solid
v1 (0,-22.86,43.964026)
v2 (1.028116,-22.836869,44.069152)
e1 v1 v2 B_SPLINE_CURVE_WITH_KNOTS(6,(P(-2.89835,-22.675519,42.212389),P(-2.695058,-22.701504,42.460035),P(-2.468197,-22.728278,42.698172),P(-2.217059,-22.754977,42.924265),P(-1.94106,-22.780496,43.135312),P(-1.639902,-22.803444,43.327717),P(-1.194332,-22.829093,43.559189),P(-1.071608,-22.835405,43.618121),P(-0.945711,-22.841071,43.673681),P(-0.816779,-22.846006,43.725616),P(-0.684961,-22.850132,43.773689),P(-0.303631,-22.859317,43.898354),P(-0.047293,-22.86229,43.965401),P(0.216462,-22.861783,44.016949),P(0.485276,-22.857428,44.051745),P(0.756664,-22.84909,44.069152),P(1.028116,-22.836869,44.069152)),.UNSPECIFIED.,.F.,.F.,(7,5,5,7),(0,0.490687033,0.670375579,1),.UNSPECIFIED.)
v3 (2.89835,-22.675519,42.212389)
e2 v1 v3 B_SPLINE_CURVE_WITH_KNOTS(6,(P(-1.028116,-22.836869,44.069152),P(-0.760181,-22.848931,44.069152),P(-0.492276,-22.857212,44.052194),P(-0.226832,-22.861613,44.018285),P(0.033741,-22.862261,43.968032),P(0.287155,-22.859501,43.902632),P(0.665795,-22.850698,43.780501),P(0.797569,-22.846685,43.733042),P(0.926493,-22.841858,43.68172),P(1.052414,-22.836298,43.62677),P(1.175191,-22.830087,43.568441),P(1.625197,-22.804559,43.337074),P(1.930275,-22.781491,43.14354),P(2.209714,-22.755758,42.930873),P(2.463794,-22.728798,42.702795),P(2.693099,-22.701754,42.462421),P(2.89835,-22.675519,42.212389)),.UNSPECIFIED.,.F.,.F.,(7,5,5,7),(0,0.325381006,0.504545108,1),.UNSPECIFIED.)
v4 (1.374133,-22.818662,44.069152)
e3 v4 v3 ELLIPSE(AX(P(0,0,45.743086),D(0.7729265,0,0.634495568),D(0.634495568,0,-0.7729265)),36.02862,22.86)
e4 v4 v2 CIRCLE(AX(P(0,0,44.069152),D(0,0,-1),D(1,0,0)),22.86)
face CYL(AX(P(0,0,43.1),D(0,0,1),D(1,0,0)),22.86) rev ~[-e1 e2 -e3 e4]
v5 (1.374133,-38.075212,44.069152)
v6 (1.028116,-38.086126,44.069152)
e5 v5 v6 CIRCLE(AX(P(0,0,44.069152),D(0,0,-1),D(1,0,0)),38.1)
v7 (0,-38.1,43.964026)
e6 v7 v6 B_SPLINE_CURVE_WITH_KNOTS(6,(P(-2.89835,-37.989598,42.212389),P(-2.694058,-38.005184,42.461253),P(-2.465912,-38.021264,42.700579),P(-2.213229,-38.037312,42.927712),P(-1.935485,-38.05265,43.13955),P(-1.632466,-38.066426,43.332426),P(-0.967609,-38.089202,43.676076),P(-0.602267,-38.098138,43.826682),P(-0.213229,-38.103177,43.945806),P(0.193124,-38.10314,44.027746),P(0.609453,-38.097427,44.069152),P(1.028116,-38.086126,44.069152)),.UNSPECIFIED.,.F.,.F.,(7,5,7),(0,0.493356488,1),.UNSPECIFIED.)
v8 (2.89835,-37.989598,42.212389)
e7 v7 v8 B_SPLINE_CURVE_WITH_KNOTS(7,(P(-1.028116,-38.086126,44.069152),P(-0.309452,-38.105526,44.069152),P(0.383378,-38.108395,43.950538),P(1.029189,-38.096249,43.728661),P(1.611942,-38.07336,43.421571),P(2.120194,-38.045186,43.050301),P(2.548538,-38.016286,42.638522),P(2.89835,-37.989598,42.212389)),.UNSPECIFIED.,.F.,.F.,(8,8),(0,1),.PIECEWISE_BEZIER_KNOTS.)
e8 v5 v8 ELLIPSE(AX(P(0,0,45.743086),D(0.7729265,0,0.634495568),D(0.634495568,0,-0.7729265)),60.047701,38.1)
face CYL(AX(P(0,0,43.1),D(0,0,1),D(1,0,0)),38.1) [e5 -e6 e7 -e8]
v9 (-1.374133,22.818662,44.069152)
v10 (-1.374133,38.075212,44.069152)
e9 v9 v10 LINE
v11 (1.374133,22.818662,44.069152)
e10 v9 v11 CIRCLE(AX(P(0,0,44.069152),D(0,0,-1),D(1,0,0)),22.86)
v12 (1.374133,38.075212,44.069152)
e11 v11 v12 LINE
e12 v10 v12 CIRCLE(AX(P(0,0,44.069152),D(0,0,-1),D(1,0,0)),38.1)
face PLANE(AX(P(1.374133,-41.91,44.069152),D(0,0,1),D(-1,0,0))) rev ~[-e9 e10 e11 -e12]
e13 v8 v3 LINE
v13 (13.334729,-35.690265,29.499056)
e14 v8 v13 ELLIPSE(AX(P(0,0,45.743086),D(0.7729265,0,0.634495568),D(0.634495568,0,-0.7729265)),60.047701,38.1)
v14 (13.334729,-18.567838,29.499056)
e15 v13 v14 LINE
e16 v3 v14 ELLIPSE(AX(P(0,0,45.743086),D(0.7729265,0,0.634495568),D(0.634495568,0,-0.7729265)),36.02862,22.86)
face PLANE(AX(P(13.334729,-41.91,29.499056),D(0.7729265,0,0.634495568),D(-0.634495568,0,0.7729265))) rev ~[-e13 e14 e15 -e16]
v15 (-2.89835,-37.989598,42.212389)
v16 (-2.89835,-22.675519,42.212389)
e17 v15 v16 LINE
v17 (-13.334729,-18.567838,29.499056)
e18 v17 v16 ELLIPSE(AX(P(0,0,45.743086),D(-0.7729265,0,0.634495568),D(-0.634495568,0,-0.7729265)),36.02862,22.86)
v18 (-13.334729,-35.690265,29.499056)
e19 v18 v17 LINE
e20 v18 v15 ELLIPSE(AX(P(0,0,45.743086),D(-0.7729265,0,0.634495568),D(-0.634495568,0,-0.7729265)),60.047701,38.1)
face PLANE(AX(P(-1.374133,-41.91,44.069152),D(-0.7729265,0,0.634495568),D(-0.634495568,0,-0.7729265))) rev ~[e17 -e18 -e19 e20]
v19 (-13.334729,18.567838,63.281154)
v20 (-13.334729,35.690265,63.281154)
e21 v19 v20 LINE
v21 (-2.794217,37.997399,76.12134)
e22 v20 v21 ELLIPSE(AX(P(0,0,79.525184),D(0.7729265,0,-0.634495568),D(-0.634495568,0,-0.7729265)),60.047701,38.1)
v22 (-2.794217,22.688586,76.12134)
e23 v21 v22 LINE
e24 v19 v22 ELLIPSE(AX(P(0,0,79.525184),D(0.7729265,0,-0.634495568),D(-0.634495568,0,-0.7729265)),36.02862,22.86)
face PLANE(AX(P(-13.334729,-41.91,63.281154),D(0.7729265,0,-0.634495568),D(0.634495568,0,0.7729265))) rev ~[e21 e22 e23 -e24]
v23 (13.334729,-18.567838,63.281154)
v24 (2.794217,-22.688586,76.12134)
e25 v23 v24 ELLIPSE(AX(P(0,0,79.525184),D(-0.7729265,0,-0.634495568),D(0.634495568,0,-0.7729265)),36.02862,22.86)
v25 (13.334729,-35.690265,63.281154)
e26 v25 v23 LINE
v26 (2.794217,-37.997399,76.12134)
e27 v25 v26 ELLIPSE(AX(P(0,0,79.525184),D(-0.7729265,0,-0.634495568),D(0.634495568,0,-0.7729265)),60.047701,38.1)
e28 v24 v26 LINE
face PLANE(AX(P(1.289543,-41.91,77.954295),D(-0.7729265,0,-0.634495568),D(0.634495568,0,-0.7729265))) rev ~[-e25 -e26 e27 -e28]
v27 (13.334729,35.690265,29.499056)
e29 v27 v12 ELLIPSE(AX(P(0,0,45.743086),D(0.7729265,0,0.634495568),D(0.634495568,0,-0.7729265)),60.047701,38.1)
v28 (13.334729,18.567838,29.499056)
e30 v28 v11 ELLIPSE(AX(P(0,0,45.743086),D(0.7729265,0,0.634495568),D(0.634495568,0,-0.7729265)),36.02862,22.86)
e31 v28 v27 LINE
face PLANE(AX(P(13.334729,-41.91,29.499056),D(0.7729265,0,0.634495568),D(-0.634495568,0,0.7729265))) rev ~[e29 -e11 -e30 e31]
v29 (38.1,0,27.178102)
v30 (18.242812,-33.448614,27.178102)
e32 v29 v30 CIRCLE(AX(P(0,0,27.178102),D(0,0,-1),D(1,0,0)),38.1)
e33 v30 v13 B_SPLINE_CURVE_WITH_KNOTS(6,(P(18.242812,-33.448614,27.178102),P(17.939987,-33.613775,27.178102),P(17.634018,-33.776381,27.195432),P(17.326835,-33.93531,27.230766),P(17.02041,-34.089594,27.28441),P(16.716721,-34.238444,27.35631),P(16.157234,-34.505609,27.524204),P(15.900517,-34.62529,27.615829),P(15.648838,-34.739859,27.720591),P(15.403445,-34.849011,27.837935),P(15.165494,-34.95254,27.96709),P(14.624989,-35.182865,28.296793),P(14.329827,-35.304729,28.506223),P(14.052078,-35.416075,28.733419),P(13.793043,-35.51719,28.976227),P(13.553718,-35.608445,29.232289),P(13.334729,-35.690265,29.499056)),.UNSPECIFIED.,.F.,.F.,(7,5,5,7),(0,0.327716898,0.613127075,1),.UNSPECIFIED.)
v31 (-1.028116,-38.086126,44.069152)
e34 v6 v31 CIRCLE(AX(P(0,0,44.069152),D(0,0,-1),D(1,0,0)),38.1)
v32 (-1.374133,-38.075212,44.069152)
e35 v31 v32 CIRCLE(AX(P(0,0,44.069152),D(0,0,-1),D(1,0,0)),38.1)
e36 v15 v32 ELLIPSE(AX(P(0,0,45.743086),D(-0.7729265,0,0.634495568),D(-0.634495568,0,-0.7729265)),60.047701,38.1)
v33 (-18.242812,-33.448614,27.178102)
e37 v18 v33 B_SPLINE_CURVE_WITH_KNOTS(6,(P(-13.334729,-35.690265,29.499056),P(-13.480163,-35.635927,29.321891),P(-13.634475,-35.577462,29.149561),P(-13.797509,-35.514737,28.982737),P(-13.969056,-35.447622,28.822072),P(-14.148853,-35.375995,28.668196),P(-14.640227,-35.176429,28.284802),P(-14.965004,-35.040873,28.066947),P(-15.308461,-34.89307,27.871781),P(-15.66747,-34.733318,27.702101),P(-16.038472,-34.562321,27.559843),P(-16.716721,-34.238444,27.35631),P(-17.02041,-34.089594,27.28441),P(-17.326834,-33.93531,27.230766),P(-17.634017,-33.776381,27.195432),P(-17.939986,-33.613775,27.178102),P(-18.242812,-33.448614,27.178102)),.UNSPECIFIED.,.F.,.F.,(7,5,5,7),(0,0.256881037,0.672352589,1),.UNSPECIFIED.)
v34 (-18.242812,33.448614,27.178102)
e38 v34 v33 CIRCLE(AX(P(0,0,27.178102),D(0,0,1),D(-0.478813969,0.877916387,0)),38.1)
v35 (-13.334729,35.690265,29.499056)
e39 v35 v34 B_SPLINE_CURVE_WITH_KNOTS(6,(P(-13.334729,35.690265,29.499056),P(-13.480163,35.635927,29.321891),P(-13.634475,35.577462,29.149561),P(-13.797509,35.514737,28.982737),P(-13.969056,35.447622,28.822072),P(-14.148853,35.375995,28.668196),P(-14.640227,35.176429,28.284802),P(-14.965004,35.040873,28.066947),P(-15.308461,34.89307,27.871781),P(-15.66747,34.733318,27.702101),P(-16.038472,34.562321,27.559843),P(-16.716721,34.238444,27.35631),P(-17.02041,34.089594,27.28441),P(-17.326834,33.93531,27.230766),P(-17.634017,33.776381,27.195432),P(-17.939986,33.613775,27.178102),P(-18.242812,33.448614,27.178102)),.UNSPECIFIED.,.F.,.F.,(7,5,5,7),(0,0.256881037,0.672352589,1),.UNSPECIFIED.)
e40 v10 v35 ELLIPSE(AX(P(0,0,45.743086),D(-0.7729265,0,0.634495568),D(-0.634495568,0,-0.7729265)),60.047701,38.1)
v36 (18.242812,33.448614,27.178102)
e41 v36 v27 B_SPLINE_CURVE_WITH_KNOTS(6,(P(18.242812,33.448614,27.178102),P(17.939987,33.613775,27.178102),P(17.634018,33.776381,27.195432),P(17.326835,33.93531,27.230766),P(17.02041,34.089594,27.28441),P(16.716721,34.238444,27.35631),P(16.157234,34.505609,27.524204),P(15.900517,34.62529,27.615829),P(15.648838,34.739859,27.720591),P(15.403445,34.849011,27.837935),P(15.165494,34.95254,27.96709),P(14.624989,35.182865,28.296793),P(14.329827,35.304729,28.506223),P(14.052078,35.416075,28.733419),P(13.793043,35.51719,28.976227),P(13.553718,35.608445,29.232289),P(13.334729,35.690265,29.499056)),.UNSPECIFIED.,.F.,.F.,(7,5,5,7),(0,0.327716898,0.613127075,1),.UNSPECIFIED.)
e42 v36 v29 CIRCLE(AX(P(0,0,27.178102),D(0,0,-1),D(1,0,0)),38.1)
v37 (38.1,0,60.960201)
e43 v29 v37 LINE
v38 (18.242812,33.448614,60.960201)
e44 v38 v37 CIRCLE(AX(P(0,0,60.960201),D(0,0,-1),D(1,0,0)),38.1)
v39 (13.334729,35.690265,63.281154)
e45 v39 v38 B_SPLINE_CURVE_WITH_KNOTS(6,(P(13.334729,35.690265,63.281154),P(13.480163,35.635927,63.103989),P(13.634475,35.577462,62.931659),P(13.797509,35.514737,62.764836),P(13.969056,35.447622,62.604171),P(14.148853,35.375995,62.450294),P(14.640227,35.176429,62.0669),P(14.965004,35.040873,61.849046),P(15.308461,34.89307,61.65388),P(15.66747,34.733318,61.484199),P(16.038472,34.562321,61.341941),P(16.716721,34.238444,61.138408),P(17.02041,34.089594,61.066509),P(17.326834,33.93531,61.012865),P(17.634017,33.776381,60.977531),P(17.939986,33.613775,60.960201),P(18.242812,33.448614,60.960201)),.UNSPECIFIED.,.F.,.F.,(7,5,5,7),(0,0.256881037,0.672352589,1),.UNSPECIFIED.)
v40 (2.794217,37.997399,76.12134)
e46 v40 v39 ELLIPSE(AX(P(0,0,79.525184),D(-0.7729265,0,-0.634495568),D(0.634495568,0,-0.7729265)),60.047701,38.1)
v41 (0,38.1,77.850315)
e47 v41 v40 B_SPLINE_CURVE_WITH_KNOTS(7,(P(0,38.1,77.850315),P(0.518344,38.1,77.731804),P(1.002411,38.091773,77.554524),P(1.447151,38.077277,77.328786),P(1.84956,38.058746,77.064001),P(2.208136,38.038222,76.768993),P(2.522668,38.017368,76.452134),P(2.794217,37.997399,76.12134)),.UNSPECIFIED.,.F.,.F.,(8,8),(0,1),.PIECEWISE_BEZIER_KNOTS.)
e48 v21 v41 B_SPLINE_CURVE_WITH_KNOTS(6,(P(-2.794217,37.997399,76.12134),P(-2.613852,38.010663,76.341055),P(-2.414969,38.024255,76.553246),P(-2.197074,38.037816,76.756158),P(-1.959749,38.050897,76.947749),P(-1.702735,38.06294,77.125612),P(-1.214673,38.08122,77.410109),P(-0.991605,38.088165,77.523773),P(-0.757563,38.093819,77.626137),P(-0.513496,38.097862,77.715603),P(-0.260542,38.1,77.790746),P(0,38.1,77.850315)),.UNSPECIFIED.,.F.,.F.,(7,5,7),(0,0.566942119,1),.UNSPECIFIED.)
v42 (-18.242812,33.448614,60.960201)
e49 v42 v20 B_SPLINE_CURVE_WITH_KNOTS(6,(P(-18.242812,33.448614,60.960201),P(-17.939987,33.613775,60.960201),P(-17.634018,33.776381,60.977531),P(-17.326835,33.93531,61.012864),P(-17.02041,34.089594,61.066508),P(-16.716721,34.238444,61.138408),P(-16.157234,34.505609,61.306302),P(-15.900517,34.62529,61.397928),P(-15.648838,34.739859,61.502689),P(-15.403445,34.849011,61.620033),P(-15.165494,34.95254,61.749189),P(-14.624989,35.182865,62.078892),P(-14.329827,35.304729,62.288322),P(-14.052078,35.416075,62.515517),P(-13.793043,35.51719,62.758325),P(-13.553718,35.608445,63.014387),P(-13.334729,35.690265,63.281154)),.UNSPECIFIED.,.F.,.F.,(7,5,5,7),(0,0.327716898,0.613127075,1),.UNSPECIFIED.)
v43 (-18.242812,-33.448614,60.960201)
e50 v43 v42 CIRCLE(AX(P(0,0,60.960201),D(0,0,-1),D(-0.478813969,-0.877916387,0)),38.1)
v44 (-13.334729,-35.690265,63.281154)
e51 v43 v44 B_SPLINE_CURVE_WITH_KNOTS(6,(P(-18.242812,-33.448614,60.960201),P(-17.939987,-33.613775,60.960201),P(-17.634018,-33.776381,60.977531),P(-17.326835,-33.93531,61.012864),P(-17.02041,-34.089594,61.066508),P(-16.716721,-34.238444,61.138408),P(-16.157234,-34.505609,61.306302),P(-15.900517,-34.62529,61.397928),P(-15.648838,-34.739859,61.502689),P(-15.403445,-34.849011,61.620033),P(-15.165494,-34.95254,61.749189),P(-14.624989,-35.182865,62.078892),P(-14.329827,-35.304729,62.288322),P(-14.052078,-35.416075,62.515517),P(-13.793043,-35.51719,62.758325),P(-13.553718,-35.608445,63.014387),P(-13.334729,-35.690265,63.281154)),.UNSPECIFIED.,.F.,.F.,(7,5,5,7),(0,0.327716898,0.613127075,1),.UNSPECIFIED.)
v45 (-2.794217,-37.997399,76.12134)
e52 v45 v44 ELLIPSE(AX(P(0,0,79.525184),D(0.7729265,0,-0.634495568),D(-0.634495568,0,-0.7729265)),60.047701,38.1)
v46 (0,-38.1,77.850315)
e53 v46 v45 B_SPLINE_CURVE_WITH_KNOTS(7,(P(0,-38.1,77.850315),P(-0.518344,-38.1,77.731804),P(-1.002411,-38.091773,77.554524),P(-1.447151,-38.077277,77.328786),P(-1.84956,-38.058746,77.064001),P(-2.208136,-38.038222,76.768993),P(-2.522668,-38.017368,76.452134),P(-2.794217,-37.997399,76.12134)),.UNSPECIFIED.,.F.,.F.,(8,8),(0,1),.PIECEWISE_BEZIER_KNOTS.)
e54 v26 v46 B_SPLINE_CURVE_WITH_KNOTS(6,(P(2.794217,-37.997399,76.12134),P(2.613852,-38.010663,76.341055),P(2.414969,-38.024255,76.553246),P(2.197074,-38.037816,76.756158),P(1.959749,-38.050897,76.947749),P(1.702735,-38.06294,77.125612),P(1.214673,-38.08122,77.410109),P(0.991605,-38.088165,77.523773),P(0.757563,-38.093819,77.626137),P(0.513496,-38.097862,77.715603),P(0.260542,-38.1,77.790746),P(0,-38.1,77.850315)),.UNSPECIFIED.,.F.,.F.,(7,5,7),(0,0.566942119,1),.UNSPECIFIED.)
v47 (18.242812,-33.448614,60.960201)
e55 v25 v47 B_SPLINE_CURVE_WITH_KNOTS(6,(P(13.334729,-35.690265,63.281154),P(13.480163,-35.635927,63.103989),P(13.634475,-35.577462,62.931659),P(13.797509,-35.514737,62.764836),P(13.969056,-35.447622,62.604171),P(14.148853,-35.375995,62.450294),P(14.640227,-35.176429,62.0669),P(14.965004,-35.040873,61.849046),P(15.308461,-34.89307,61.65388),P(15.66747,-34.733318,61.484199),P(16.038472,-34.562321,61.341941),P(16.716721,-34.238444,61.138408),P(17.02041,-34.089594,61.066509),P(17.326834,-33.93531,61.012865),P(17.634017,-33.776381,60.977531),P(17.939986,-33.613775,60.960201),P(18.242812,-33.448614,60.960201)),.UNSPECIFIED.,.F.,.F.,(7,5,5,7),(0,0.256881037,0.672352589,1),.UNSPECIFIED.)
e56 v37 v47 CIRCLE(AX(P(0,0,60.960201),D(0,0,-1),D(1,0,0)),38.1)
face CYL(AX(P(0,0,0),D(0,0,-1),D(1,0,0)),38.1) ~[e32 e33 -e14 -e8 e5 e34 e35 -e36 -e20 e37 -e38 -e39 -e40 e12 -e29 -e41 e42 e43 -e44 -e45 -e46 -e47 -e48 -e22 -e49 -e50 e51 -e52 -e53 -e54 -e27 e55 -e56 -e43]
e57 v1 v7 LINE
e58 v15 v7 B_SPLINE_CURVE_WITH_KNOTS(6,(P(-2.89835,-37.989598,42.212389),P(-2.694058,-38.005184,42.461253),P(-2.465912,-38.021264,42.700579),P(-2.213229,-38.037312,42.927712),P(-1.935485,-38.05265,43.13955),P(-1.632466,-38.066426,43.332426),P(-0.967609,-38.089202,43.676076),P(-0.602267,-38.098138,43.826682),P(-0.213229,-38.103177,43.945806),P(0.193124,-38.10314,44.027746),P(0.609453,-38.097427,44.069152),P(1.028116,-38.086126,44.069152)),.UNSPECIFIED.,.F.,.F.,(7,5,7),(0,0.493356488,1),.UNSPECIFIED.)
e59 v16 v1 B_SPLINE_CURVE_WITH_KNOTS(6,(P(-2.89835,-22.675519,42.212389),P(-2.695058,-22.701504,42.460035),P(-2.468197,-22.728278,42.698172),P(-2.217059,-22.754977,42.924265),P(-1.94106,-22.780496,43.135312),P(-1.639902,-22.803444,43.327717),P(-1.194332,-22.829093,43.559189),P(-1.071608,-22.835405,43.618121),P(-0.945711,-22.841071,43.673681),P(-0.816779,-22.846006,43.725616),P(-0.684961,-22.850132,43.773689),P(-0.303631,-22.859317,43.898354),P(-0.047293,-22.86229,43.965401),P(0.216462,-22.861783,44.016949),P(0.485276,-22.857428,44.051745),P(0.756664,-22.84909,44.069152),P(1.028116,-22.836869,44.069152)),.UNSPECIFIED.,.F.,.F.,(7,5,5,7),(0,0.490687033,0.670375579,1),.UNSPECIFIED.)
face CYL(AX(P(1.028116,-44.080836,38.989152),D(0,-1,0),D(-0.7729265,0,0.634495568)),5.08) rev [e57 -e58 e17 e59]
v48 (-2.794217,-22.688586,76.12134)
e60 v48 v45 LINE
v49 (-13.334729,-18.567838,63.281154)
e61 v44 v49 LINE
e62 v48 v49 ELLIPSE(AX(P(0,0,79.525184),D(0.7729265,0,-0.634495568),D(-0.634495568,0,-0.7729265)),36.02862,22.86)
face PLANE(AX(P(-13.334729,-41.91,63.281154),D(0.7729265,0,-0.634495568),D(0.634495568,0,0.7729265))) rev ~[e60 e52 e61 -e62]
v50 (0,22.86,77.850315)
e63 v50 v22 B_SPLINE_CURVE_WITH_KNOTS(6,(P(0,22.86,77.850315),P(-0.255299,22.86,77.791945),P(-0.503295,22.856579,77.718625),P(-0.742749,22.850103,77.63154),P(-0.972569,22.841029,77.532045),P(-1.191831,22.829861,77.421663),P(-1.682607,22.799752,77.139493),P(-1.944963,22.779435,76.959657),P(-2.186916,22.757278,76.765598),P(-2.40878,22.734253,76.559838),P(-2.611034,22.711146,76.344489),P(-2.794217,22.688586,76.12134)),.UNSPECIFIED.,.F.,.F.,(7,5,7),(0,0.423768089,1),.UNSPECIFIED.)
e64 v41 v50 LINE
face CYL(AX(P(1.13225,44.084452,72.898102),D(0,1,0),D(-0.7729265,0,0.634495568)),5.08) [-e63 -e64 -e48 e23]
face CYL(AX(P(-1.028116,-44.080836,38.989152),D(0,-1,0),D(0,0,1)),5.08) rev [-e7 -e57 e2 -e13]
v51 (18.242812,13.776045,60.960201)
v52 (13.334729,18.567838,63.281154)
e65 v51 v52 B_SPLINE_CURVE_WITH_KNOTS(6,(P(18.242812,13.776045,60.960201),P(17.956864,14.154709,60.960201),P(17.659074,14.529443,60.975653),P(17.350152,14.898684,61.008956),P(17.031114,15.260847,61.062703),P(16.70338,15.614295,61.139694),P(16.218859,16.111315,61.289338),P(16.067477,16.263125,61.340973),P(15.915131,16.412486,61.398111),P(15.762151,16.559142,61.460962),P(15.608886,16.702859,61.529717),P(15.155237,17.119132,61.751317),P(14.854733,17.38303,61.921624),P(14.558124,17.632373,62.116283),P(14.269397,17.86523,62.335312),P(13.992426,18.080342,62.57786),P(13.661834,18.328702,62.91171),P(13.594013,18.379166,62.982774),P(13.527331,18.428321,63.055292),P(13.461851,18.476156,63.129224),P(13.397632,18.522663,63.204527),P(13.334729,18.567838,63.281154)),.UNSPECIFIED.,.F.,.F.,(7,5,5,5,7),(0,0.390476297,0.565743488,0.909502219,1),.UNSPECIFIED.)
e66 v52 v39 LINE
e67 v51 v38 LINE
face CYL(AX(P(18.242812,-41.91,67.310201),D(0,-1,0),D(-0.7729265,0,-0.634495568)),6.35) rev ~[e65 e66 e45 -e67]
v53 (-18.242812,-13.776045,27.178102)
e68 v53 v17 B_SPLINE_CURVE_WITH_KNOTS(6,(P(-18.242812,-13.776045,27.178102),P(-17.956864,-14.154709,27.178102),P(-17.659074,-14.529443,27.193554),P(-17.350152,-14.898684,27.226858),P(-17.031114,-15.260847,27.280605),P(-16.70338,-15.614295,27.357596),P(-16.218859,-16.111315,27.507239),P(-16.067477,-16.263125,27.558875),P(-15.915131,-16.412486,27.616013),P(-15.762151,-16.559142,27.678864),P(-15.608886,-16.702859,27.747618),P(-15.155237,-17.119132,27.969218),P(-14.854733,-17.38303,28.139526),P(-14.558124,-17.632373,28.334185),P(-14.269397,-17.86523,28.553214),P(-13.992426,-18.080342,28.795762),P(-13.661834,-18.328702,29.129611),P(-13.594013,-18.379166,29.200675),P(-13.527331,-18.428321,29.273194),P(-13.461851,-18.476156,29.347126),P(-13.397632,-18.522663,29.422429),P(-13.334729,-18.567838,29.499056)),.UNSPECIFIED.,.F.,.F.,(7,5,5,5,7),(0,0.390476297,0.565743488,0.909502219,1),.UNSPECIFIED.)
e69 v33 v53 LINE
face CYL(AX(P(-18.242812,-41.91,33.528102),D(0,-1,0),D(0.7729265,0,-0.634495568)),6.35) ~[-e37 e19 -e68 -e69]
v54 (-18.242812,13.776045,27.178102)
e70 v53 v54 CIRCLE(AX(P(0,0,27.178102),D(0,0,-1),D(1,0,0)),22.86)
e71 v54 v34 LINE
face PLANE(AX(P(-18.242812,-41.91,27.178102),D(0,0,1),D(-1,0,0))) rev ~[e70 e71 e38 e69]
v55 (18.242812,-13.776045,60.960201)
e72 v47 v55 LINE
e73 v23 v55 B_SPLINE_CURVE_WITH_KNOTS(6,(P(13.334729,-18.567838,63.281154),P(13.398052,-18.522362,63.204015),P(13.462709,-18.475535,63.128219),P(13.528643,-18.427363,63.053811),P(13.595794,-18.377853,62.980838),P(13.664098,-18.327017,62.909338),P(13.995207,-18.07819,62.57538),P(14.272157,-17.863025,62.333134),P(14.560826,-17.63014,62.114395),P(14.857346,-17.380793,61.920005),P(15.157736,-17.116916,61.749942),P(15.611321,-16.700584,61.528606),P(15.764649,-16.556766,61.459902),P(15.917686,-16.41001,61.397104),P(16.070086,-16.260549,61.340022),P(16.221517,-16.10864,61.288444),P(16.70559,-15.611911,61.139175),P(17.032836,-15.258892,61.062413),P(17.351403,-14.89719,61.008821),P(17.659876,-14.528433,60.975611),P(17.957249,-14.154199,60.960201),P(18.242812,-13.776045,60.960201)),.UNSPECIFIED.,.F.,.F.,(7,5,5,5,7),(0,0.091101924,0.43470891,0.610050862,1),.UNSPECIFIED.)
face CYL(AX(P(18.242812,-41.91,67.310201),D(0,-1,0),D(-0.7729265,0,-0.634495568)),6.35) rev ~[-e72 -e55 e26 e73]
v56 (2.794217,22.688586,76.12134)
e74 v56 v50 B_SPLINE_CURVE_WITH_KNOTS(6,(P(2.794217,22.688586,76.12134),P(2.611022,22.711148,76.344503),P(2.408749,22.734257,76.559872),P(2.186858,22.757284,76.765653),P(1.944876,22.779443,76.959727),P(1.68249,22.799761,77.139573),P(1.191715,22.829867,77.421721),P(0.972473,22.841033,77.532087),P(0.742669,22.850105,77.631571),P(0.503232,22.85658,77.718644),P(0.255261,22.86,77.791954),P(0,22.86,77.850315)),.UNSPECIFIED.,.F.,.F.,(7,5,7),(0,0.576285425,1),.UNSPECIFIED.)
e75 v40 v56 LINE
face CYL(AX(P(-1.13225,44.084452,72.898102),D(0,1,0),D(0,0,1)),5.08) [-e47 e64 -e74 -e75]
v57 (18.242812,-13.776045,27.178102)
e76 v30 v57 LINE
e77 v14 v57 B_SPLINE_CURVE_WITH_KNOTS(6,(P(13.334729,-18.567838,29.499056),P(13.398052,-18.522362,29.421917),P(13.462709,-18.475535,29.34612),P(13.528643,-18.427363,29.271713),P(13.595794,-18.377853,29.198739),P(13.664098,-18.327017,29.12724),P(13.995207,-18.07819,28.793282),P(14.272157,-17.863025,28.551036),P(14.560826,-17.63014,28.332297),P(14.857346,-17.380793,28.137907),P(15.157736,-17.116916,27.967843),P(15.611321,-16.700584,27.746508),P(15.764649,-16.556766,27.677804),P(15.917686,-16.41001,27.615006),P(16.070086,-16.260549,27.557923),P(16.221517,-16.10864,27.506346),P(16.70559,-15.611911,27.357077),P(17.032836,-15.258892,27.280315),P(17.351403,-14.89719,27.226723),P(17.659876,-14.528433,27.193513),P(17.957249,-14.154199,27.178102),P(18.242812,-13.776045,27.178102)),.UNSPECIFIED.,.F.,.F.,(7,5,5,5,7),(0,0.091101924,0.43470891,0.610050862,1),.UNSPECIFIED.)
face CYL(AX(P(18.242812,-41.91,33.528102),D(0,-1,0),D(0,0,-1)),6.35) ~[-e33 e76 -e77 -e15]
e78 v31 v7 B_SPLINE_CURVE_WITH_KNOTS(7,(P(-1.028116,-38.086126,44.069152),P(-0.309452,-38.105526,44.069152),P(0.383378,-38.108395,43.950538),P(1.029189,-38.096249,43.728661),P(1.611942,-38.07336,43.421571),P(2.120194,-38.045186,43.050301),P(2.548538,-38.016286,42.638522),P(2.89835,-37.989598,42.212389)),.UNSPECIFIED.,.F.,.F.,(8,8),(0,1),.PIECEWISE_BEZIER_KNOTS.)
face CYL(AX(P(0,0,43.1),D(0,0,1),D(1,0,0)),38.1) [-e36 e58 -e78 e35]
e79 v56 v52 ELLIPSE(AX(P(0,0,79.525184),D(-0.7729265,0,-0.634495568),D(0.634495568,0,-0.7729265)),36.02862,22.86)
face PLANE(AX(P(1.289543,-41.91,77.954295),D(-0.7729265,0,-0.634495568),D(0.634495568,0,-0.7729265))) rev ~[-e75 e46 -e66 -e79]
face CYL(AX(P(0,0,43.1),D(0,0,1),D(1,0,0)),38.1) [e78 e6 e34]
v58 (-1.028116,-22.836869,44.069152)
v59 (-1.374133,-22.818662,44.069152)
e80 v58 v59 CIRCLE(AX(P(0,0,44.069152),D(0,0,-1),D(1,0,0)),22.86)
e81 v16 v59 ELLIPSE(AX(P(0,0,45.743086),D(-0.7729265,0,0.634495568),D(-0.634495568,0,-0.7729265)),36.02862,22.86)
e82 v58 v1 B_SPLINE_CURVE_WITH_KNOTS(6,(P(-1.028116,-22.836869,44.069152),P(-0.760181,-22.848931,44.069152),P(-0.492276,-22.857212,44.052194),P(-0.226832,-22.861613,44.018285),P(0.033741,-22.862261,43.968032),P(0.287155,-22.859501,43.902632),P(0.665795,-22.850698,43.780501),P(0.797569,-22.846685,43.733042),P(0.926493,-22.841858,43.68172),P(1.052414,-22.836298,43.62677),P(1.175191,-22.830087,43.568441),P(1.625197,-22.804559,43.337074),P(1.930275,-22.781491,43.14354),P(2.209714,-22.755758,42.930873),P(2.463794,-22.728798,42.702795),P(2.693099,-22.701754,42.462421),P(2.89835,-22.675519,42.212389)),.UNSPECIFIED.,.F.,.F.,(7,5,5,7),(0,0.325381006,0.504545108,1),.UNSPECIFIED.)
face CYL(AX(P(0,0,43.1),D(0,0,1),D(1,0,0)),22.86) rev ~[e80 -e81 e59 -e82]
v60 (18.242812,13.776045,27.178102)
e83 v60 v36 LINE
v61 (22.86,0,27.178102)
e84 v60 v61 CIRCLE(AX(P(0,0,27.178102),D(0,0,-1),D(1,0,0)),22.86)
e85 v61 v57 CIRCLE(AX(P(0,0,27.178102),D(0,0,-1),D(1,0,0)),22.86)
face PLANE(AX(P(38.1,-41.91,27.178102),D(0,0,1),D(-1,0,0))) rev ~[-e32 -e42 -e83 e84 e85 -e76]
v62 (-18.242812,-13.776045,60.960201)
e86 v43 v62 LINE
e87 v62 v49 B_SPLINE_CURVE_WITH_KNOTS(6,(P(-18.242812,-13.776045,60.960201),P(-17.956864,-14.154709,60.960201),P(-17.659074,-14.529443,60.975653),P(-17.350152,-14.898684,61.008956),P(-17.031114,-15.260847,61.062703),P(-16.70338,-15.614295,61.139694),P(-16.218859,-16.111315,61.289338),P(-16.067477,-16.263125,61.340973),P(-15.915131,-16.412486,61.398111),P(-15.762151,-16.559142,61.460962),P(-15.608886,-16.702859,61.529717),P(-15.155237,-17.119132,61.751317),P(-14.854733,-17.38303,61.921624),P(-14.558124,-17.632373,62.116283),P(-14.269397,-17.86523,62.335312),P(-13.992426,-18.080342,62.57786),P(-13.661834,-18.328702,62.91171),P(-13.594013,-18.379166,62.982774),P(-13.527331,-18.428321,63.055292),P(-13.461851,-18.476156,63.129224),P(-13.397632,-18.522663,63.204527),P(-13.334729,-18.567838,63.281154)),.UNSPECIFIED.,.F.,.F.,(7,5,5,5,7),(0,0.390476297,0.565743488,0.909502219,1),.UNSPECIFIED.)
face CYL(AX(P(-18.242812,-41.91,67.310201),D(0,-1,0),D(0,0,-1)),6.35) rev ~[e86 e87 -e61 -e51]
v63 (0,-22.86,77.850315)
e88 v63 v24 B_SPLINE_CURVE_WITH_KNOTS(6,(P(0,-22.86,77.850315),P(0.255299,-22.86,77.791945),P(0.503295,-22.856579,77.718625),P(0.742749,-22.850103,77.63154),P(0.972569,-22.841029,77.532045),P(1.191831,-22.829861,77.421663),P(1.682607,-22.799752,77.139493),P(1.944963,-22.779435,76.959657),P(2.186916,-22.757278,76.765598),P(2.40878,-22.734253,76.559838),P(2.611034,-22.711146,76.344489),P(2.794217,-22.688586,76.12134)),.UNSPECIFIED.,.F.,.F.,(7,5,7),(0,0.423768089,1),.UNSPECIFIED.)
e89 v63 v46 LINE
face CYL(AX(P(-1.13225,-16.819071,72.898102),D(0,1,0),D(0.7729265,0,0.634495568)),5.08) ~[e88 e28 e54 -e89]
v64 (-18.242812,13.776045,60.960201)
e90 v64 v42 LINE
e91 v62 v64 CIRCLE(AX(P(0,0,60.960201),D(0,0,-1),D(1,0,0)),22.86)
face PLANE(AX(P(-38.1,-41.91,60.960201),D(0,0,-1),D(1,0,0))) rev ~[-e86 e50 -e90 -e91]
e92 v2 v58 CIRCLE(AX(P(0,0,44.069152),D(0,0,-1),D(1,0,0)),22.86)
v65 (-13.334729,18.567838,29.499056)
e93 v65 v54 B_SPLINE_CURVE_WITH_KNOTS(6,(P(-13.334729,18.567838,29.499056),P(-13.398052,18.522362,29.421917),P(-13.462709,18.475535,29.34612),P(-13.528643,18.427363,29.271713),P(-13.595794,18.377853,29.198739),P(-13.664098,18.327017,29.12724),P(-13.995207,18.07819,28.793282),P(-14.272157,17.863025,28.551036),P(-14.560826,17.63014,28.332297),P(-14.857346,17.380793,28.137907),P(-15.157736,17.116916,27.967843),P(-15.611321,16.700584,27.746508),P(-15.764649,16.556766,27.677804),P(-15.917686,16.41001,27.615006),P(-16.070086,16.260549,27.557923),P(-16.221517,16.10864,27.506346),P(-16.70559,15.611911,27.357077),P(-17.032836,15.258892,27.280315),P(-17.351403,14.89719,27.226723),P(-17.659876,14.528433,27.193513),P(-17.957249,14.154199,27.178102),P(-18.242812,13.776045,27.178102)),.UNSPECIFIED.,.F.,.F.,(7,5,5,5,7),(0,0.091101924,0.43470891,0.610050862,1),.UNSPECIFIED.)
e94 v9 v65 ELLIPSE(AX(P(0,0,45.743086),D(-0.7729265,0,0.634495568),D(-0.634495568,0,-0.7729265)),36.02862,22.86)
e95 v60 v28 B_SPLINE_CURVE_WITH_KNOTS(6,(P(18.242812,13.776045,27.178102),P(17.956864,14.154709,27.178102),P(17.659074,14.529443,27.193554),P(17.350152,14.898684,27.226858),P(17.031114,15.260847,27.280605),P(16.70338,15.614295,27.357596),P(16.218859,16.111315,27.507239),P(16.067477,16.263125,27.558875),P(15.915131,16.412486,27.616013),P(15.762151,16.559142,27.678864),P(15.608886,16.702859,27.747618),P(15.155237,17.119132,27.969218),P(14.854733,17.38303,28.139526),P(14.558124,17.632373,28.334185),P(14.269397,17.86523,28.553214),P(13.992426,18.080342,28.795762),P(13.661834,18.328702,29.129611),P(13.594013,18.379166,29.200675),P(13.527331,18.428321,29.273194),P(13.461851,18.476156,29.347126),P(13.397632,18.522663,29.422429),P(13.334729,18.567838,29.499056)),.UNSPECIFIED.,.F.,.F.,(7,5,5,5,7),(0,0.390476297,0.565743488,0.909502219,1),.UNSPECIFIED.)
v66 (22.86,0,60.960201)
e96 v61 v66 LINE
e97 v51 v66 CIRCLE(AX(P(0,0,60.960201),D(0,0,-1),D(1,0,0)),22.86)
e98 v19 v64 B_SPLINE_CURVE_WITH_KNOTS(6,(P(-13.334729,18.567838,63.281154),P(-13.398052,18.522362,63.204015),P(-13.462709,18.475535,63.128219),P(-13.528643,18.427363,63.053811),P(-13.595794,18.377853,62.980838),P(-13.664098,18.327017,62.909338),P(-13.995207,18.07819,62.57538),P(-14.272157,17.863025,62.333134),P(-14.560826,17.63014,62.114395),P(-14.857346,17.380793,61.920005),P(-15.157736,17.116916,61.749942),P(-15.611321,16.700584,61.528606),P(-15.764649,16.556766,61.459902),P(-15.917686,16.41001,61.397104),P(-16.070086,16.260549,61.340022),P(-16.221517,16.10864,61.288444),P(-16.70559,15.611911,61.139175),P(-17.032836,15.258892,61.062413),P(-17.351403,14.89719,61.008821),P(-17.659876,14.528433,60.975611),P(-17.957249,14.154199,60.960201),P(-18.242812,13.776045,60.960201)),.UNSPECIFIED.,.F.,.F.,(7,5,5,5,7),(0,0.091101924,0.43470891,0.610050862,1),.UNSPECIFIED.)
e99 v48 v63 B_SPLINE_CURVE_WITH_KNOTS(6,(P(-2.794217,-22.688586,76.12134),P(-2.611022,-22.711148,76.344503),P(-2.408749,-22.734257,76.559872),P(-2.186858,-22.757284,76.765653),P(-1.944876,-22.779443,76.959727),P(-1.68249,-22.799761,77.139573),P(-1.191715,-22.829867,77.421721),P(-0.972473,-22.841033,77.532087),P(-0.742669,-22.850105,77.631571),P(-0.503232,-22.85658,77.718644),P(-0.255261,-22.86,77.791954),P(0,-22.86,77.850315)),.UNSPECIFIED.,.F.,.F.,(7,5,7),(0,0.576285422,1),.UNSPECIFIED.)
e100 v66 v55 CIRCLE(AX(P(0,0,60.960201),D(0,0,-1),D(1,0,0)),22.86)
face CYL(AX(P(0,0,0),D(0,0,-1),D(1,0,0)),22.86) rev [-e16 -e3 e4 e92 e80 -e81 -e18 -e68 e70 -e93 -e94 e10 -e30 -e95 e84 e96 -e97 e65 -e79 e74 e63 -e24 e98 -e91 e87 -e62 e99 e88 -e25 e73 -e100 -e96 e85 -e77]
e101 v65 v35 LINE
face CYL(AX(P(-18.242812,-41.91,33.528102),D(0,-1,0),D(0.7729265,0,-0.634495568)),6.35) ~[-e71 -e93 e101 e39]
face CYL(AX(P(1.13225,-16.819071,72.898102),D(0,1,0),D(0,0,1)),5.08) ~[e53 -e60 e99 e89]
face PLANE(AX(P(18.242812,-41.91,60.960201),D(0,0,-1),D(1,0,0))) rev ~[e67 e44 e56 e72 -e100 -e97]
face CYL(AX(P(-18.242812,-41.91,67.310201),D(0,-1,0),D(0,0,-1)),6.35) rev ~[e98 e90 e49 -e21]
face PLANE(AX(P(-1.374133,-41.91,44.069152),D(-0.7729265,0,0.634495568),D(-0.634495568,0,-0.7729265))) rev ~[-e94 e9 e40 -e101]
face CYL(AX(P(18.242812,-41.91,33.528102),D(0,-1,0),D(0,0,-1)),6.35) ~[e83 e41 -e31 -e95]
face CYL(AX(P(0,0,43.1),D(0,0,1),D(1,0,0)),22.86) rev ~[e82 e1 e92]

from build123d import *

# Parameters (mm, degrees)
F0_R         = 38.1
F0_R_2       = 22.86
F1_DEPTH     = 127
F4_DEPTH     = 80.011
F5_T4_DEPTH  = 27.2677982704
F5_S5_R      = 38.1
F5_T6_DEPTH  = 15
F5_S7_R      = 22.86
F5_T8_DEPTH  = 15
F5_T12_DEPTH = 27.2677982704
F5_S13_R     = 38.1
F5_T14_DEPTH = 15
F5_S15_R     = 22.86
F5_T16_DEPTH = 15
F5_T17_DEPTH = 27.2653813946
F5_T19_DEPTH = 27.2653813946


# Not quite as in the source:
# - a fillet or chamfer that OpenCascade refuses, or shapes differently, is made with other operations: its cross-section is extruded or revolved along the edge and cut away or added


with BuildPart() as f1:
    # F0 (on Top) → F1 (new body)
    with BuildSketch(Plane.XY):
        Circle(F0_R)
        Circle(F0_R_2, mode=Mode.SUBTRACT)
    extrude(amount=F1_DEPTH)

    # F3 (on offset) → F4 (cut, through all)
    with BuildSketch(Plane.XZ.offset(41.91)):
        with BuildLine():
            Line((1.3741332924, 44.0691516455), (0, 44.0691516455))
            Line((0, 44.0691516455), (0, 27.1781024958))
            Line((0, 27.1781024958), (0, -6.6039958037))
            Line((0, -6.6039958037), (38.1, -6.6039958037))
            Line((38.1, -6.6039958037), (38.1, 27.1781024958))
            Line((38.1, 27.1781024958), (18.242812226, 27.1781024958))
            ThreePointArc((18.242812226, 27.1781024958), (15.5282171859, 27.7875908663), (13.3347289514, 29.4990556395))
            Line((13.3347289514, 29.4990556395), (1.3741332924, 44.0691516455))
        make_face()
        with BuildLine():
            Line((0, 44.0691516455), (-1.3741332924, 44.0691516455))
            Line((-1.3741332924, 44.0691516455), (-13.3347289514, 29.4990556395))
            ThreePointArc((-13.3347289514, 29.4990556395), (-15.5282171859, 27.7875908663), (-18.242812226, 27.1781024958))
            Line((-18.242812226, 27.1781024958), (-38.1, 27.1781024958))
            Line((-38.1, 27.1781024958), (-38.1, -6.6039958037))
            Line((-38.1, -6.6039958037), (0, -6.6039958037))
            Line((0, -6.6039958037), (0, 27.1781024958))
            Line((0, 27.1781024958), (0, 44.0691516455))
        make_face()
        with BuildLine():
            Line((38.1, 60.9602007953), (38.1, 77.9781024958))
            Line((38.1, 77.9781024958), (1.27, 77.9781024958))
            Line((1.27, 77.9781024958), (1.2895432809, 77.9542953638))
            Line((1.2895432809, 77.9542953638), (13.3347289514, 63.281153939))
            ThreePointArc((13.3347289514, 63.281153939), (15.5282171859, 61.5696891658), (18.242812226, 60.9602007953))
            Line((18.242812226, 60.9602007953), (38.1, 60.9602007953))
        make_face()
        with BuildLine():
            Line((-38.1, 77.9781024958), (-38.1, 60.9602007953))
            Line((-38.1, 60.9602007953), (-18.242812226, 60.9602007953))
            ThreePointArc((-18.242812226, 60.9602007953), (-15.5282171859, 61.5696891658), (-13.3347289514, 63.281153939))
            Line((-13.3347289514, 63.281153939), (-1.2895432809, 77.9542953638))
            Line((-1.2895432809, 77.9542953638), (-1.27, 77.9781024958))
            Line((-1.27, 77.9781024958), (-38.1, 77.9781024958))
        make_face()
        Polygon((-38.1, 131.2988996506), (-38.1, 77.9781024958), (-1.27, 77.9781024958), (-1.2391987117, 77.9781024958), (-0.1262114529, 77.9781024958), (0, 77.9781024958), (1.2391987117, 77.9781024958), (1.27, 77.9781024958), (38.1, 77.9781024958), (38.1, 80.6030047561), (38.1, 131.2988996506), align=None)
    extrude(amount=-F4_DEPTH, mode=Mode.SUBTRACT)

    # F5: fillet of radius 5.08 on 6 edges, made by hand


with BuildPart() as f5_tool2:
    # F5_s3 → F5_t4 (new body)
    with BuildSketch(Plane.XZ.offset(44.0808363055)):
        with BuildLine():
            ThreePointArc((-1.0281164884, 44.0691516455), (1.1435595437, 43.5815609491), (2.8983501313, 42.2123891305))
            Line((2.8983501313, 42.2123891305), (1.3741332924, 44.0691516455))
            Line((1.3741332924, 44.0691516455), (-1.0281164884, 44.0691516455))
        make_face()
    extrude(amount=-F5_T4_DEPTH)

    # F5_s5 → F5_t6 (intersect, symmetric)
    with BuildSketch(Plane.XY.offset(43.1)):
        Circle(F5_S5_R)
    extrude(amount=F5_T6_DEPTH, both=True, mode=Mode.INTERSECT)

    # F5_s7 → F5_t8 (cut, symmetric)
    with BuildSketch(Plane.XY.offset(43.1)):
        Circle(F5_S7_R)
    extrude(amount=F5_T8_DEPTH, both=True, mode=Mode.SUBTRACT)


with BuildPart() as f1_1:
    add(f1.part)

    # F5_t1: union F5_tool2
    add(f5_tool2.part)


with BuildPart() as f5_tool10:
    # F5_s11 → F5_t12 (new body)
    with BuildSketch(Plane.XZ.offset(44.0808363055)):
        with BuildLine():
            ThreePointArc((-2.8983501313, 42.2123891305), (-1.1435595437, 43.5815609491), (1.0281164884, 44.0691516455))
            Line((1.0281164884, 44.0691516455), (-1.3741332924, 44.0691516455))
            Line((-1.3741332924, 44.0691516455), (-2.8983501313, 42.2123891305))
        make_face()
    extrude(amount=-F5_T12_DEPTH)

    # F5_s13 → F5_t14 (intersect, symmetric)
    with BuildSketch(Plane.XY.offset(43.1)):
        Circle(F5_S13_R)
    extrude(amount=F5_T14_DEPTH, both=True, mode=Mode.INTERSECT)

    # F5_s15 → F5_t16 (cut, symmetric)
    with BuildSketch(Plane.XY.offset(43.1)):
        Circle(F5_S15_R)
    extrude(amount=F5_T16_DEPTH, both=True, mode=Mode.SUBTRACT)


with BuildPart() as f1_2:
    add(f1_1.part)

    # F5_t9: union F5_tool10
    add(f5_tool10.part)

    # F5_s18 → F5_t17 (cut)
    with BuildSketch(Plane.XZ.offset(16.8190705077)):
        with BuildLine():
            ThreePointArc((2.7942168389, 76.1213399807), (1.0394262513, 77.4905117994), (-1.1322497808, 77.9781024958))
            Line((-1.1322497808, 77.9781024958), (1.27, 77.9781024958))
            Line((1.27, 77.9781024958), (2.7942168389, 76.1213399807))
        make_face()
        with BuildLine():
            ThreePointArc((1.1322497808, 77.9781024958), (-1.0394262513, 77.4905117994), (-2.7942168389, 76.1213399807))
            Line((-2.7942168389, 76.1213399807), (-1.27, 77.9781024958))
            Line((-1.27, 77.9781024958), (1.1322497808, 77.9781024958))
        make_face()
    extrude(amount=F5_T17_DEPTH, mode=Mode.SUBTRACT)

    # F5_s20 → F5_t19 (cut)
    with BuildSketch(Plane.XZ.offset(-44.0844519023)):
        with BuildLine():
            ThreePointArc((-1.1322497808, 77.9781024958), (1.0394262513, 77.4905117994), (2.7942168389, 76.1213399807))
            Line((2.7942168389, 76.1213399807), (1.27, 77.9781024958))
            Line((1.27, 77.9781024958), (-1.1322497808, 77.9781024958))
        make_face()
        with BuildLine():
            ThreePointArc((-2.7942168389, 76.1213399807), (-1.0394262513, 77.4905117994), (1.1322497808, 77.9781024958))
            Line((1.1322497808, 77.9781024958), (-1.27, 77.9781024958))
            Line((-1.27, 77.9781024958), (-2.7942168389, 76.1213399807))
        make_face()
    extrude(amount=F5_T19_DEPTH, mode=Mode.SUBTRACT)


solid = f1_2.part
